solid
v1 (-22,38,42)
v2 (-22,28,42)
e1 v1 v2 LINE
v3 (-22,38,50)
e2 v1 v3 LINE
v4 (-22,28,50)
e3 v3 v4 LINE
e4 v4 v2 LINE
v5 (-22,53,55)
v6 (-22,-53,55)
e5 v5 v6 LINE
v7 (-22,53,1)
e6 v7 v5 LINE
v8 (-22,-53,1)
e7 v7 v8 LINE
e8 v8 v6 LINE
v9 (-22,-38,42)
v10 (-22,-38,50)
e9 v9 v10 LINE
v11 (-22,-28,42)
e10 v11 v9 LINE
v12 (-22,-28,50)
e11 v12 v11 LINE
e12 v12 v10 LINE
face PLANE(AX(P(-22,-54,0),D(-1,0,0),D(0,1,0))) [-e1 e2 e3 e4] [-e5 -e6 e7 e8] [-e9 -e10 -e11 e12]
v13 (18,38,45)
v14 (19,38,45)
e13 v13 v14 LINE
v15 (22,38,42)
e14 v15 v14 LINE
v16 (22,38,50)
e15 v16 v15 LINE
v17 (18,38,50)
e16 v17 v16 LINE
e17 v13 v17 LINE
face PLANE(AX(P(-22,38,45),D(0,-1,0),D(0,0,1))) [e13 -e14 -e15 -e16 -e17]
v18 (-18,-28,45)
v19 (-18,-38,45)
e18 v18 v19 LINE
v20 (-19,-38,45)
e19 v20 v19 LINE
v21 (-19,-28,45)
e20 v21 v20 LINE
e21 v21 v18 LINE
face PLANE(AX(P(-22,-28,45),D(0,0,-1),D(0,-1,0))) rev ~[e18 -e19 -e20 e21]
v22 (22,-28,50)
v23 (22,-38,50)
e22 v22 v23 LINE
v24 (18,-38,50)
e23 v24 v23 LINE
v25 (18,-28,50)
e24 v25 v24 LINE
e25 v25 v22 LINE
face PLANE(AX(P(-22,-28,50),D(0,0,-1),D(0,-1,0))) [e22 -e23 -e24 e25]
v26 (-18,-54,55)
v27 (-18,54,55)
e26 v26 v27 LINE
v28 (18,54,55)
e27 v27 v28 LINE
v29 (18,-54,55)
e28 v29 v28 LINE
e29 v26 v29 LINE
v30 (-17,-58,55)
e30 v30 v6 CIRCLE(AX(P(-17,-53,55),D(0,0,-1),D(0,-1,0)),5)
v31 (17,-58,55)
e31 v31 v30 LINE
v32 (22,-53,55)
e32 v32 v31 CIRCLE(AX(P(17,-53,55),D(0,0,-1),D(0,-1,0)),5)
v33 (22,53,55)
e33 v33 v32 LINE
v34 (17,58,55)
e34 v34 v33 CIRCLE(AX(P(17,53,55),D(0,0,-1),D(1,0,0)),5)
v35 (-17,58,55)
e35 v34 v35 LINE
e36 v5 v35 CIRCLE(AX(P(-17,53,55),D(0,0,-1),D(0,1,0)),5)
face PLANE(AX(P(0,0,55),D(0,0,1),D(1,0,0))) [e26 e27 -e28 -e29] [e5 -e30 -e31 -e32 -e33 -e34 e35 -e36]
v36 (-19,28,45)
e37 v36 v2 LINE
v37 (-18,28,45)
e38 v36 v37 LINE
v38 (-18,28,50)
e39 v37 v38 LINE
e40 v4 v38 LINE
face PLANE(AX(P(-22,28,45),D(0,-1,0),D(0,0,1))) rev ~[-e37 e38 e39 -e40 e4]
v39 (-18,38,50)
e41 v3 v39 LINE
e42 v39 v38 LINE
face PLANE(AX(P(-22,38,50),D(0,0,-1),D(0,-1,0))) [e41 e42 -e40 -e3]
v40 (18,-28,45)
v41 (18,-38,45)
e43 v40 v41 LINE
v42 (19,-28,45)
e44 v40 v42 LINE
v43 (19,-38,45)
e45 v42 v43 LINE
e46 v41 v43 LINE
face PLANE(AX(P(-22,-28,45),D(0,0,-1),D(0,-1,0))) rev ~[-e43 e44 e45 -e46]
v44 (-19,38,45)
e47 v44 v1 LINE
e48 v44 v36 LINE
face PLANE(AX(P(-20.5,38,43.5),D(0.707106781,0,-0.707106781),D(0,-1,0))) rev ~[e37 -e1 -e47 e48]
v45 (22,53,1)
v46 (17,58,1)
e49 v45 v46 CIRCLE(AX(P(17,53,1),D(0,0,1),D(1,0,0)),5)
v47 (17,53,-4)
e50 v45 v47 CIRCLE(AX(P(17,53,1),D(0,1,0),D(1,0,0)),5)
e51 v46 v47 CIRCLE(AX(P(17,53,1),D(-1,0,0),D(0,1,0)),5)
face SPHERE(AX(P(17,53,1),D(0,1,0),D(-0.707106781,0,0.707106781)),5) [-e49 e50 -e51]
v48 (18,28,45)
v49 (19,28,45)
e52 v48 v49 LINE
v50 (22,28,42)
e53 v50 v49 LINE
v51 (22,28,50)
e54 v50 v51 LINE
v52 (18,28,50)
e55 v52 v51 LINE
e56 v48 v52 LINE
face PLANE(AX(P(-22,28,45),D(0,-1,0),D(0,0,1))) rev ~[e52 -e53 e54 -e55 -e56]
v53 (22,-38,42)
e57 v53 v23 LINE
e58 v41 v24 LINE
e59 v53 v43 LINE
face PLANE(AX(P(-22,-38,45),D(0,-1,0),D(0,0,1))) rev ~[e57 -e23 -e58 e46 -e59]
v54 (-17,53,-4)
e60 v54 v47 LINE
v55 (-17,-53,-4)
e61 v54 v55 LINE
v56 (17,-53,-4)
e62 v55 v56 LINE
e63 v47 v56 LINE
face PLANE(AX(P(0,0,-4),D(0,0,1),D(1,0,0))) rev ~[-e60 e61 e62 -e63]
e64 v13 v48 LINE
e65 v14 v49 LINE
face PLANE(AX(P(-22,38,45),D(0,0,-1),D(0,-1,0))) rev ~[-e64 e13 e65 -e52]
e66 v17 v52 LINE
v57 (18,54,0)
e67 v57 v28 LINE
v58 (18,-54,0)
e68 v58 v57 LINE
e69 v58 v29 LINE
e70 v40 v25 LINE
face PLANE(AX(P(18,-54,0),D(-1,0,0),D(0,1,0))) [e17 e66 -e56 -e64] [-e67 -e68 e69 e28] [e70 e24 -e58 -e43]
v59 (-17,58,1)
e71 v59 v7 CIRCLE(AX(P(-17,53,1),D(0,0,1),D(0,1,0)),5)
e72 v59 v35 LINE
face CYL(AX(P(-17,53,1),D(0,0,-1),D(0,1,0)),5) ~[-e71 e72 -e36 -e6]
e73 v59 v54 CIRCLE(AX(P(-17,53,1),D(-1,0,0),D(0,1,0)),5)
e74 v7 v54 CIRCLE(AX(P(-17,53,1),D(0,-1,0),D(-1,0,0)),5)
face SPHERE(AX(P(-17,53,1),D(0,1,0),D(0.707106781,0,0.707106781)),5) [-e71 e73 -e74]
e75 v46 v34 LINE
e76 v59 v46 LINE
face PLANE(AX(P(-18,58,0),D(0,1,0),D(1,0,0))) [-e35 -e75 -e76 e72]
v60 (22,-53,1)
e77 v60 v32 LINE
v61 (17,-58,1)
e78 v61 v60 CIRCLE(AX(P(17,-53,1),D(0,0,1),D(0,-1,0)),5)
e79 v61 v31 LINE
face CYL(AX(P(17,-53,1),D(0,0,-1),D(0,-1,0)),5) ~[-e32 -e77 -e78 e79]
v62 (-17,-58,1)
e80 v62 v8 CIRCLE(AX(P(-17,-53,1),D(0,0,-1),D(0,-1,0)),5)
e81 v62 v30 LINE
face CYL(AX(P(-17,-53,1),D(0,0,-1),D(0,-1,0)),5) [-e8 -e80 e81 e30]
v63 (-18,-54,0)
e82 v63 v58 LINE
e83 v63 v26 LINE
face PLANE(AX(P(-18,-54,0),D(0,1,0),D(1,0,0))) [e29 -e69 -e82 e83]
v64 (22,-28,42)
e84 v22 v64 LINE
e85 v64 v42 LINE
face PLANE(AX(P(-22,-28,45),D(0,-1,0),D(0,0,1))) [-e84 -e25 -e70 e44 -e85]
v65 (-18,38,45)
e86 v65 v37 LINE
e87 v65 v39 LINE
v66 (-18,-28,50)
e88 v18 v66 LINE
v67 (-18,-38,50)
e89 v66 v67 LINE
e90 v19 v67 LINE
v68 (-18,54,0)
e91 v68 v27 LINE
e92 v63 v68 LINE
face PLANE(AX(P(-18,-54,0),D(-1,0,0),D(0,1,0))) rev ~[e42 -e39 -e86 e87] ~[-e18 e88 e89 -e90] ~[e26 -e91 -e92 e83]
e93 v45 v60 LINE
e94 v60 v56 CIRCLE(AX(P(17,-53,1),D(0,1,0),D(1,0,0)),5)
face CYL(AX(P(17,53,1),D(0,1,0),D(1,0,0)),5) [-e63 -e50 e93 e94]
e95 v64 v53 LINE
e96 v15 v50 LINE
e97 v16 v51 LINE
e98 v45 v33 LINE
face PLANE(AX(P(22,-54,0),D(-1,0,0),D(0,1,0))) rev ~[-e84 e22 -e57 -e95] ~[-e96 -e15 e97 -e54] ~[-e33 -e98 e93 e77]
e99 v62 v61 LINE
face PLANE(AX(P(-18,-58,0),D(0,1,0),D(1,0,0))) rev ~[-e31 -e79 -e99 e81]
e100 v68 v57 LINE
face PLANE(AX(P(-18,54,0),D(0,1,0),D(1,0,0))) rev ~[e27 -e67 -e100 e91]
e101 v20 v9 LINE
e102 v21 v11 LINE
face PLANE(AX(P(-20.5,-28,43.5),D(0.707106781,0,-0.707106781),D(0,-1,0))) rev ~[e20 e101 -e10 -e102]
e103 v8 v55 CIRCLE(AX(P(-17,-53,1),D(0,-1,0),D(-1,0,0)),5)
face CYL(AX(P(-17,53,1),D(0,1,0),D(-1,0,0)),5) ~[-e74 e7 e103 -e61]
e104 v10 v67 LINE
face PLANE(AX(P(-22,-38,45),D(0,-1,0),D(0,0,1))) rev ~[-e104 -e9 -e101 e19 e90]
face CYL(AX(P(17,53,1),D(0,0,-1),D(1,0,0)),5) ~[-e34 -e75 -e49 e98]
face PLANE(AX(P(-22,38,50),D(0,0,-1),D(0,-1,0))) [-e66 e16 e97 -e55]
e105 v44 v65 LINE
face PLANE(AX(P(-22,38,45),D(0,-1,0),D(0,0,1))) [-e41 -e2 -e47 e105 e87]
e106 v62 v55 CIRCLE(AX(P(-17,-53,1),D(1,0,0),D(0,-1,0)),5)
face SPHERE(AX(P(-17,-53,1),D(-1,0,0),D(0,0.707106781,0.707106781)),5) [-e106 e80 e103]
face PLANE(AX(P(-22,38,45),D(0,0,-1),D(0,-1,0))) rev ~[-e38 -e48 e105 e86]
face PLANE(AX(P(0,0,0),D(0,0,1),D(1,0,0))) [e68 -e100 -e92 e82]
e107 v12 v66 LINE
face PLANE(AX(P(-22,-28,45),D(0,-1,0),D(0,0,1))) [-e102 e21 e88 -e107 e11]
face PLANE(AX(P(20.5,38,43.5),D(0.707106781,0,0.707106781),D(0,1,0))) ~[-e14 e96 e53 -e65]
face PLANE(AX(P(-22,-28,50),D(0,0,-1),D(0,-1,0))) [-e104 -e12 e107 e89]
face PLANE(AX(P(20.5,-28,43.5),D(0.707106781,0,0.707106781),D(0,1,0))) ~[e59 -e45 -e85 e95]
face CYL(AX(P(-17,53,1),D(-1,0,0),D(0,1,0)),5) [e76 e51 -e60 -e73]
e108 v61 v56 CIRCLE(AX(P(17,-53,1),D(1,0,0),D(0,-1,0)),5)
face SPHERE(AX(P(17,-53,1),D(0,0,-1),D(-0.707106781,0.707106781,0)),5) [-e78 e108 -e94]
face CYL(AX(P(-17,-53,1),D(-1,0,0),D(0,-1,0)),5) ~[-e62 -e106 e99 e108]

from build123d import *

# Parameters (mm, degrees)
F0_W         = 36
F0_H         = 108
F1_DEPTH     = 55
F2_T         = 4
F3_T1_DEPTH  = 66.5
F3_T3_DEPTH  = 34
F3_T5_DEPTH  = 106
F3_S9_W      = 5
F3_S9_H      = 5
F3_T10_DEPTH = 5
F3_S15_W     = 5
F3_S15_H     = 5
F3_T16_DEPTH = 5
F3_S21_W     = 5
F3_S21_H     = 5
F3_T22_DEPTH = 5
F3_S27_W     = 5
F3_S27_H     = 5
F3_T28_DEPTH = 5
F4_W         = 10
F4_H         = 5
F5_DEPTH     = 44.001
F6_SIZE      = 3


# Not quite as in the source:
# - a fillet or chamfer that OpenCascade refuses, or shapes differently, is made with other operations: its cross-section is extruded or revolved along the edge and cut away or added


with BuildPart() as f1:
    # F0 (on Top) → F1 (new body)
    with BuildSketch(Plane.XY):
        Rectangle(F0_W, F0_H)
    extrude(amount=F1_DEPTH)

    # F2
    f2_openings = [f1.faces().sort_by_distance(p)[0] for p in [
        (0, 0, 55),
    ]]
    offset(amount=F2_T, openings=f2_openings, kind=Kind.INTERSECTION)

    # F3: fillet of radius 5 on 8 edges, made by hand

    # F3_s2 → F3_t1 (cut)
    with BuildSketch(Plane.XY.offset(1)):
        with BuildLine():
            ThreePointArc((-17, -58), (-20.5355339059, -56.5355339059), (-22, -53))
            Line((-22, -53), (-22, -58))
            Line((-22, -58), (-17, -58))
        make_face()
        with BuildLine():
            ThreePointArc((17, -58), (20.5355339059, -56.5355339059), (22, -53))
            Line((22, -53), (22, -58))
            Line((22, -58), (17, -58))
        make_face()
        with BuildLine():
            ThreePointArc((22, 53), (20.5355339059, 56.5355339059), (17, 58))
            Line((17, 58), (22, 58))
            Line((22, 58), (22, 53))
        make_face()
        with BuildLine():
            ThreePointArc((-17, 58), (-20.5355339059, 56.5355339059), (-22, 53))
            Line((-22, 53), (-22, 58))
            Line((-22, 58), (-17, 58))
        make_face()
    extrude(amount=F3_T1_DEPTH, mode=Mode.SUBTRACT)

    # F3_s4 → F3_t3 (cut)
    with BuildSketch(Plane.YZ.offset(-17)):
        with BuildLine():
            ThreePointArc((-58, 1), (-56.5355339059, -2.5355339059), (-53, -4))
            Line((-53, -4), (-58, -4))
            Line((-58, -4), (-58, 1))
        make_face()
        with BuildLine():
            ThreePointArc((58, 1), (56.5355339059, -2.5355339059), (53, -4))
            Line((53, -4), (58, -4))
            Line((58, -4), (58, 1))
        make_face()
    extrude(amount=F3_T3_DEPTH, mode=Mode.SUBTRACT)

    # F3_s6 → F3_t5 (cut)
    with BuildSketch(Plane.XZ.offset(-53)):
        with BuildLine():
            ThreePointArc((22, 1), (20.5355339059, -2.5355339059), (17, -4))
            Line((17, -4), (22, -4))
            Line((22, -4), (22, 1))
        make_face()
        with BuildLine():
            ThreePointArc((-22, 1), (-20.5355339059, -2.5355339059), (-17, -4))
            Line((-17, -4), (-22, -4))
            Line((-22, -4), (-22, 1))
        make_face()
    extrude(amount=F3_T5_DEPTH, mode=Mode.SUBTRACT)


with BuildPart() as f3_tool8:
    # F3_s9 → F3_t10 (new body)
    with BuildSketch(Plane.YZ.offset(-17)):
        with Locations((-55.5, -1.5)):
            Rectangle(F3_S9_W, F3_S9_H)
    extrude(amount=-F3_T10_DEPTH)

    # F3_s11 → F3_t12 (revolve, cut)
    with BuildSketch(Plane(origin=(-17, -53, 1), x_dir=(0, 0.7071067812, 0.7071067812), z_dir=(0, -0.7071067812, 0.7071067812))):
        with BuildLine():
            ThreePointArc((0, -5), (5, 0), (0, 5))
            Line((0, 5), (0, -5))
        make_face()
    revolve(axis=Axis((-17, -53, 1), (-1, 0, 0)), mode=Mode.SUBTRACT)


with BuildPart() as f1_1:
    add(f1.part)

    # F3_t7: cut F3_tool8
    add(f3_tool8.part, mode=Mode.SUBTRACT)


with BuildPart() as f3_tool14:
    # F3_s15 → F3_t16 (new body)
    with BuildSketch(Plane.XY.offset(1)):
        with Locations((19.5, -55.5)):
            Rectangle(F3_S15_W, F3_S15_H)
    extrude(amount=-F3_T16_DEPTH)

    # F3_s17 → F3_t18 (revolve, cut)
    with BuildSketch(Plane(origin=(17, -53, 1), x_dir=(-0.7071067812, 0.7071067812, 0), z_dir=(-0.7071067812, -0.7071067812, 0))):
        with BuildLine():
            ThreePointArc((0, -5), (5, 0), (0, 5))
            Line((0, 5), (0, -5))
        make_face()
    revolve(axis=Axis((17, -53, 1), (0, 0, -1)), mode=Mode.SUBTRACT)


with BuildPart() as f1_2:
    add(f1_1.part)

    # F3_t13: cut F3_tool14
    add(f3_tool14.part, mode=Mode.SUBTRACT)


with BuildPart() as f3_tool20:
    # F3_s21 → F3_t22 (new body)
    with BuildSketch(Plane.XZ.offset(-53)):
        with Locations((19.5, -1.5)):
            Rectangle(F3_S21_W, F3_S21_H)
    extrude(amount=-F3_T22_DEPTH)

    # F3_s23 → F3_t24 (revolve, cut)
    with BuildSketch(Plane(origin=(17, 53, 1), x_dir=(-0.7071067812, 0, 0.7071067812), z_dir=(-0.7071067812, 0, -0.7071067812))):
        with BuildLine():
            ThreePointArc((0, -5), (5, 0), (0, 5))
            Line((0, 5), (0, -5))
        make_face()
    revolve(axis=Axis((17, 53, 1), (0, 1, 0)), mode=Mode.SUBTRACT)


with BuildPart() as f1_3:
    add(f1_2.part)

    # F3_t19: cut F3_tool20
    add(f3_tool20.part, mode=Mode.SUBTRACT)


with BuildPart() as f3_tool26:
    # F3_s27 → F3_t28 (new body)
    with BuildSketch(Plane.XZ.offset(-53)):
        with Locations((-19.5, -1.5)):
            Rectangle(F3_S27_W, F3_S27_H)
    extrude(amount=-F3_T28_DEPTH)

    # F3_s29 → F3_t30 (revolve, cut)
    with BuildSketch(Plane(origin=(-17, 53, 1), x_dir=(0.7071067812, 0, 0.7071067812), z_dir=(-0.7071067812, 0, 0.7071067812))):
        with BuildLine():
            ThreePointArc((0, -5), (5, 0), (0, 5))
            Line((0, 5), (0, -5))
        make_face()
    revolve(axis=Axis((-17, 53, 1), (0, 1, 0)), mode=Mode.SUBTRACT)


with BuildPart() as f1_4:
    add(f1_3.part)

    # F3_t25: cut F3_tool26
    add(f3_tool26.part, mode=Mode.SUBTRACT)

    # F4 (on face) → F5 (cut, through all)
    with BuildSketch(Plane(origin=(-22, 0, 0), x_dir=(0, -1, 0), z_dir=(-1, 0, 0))):
        with Locations((-33, 47.5)):
            Rectangle(F4_W, F4_H)
        with Locations((33, 47.5)):
            Rectangle(F4_W, F4_H)
    extrude(amount=-F5_DEPTH, mode=Mode.SUBTRACT)

    # F6
    f6_edges = [f1_4.edges().sort_by_distance(p)[0] for p in [
        (-22, 33, 45),
        (-22, -33, 45),
        (22, -33, 45),
        (22, 33, 45),
    ]]
    chamfer(f6_edges, length=F6_SIZE)


solid = f1_4.part
